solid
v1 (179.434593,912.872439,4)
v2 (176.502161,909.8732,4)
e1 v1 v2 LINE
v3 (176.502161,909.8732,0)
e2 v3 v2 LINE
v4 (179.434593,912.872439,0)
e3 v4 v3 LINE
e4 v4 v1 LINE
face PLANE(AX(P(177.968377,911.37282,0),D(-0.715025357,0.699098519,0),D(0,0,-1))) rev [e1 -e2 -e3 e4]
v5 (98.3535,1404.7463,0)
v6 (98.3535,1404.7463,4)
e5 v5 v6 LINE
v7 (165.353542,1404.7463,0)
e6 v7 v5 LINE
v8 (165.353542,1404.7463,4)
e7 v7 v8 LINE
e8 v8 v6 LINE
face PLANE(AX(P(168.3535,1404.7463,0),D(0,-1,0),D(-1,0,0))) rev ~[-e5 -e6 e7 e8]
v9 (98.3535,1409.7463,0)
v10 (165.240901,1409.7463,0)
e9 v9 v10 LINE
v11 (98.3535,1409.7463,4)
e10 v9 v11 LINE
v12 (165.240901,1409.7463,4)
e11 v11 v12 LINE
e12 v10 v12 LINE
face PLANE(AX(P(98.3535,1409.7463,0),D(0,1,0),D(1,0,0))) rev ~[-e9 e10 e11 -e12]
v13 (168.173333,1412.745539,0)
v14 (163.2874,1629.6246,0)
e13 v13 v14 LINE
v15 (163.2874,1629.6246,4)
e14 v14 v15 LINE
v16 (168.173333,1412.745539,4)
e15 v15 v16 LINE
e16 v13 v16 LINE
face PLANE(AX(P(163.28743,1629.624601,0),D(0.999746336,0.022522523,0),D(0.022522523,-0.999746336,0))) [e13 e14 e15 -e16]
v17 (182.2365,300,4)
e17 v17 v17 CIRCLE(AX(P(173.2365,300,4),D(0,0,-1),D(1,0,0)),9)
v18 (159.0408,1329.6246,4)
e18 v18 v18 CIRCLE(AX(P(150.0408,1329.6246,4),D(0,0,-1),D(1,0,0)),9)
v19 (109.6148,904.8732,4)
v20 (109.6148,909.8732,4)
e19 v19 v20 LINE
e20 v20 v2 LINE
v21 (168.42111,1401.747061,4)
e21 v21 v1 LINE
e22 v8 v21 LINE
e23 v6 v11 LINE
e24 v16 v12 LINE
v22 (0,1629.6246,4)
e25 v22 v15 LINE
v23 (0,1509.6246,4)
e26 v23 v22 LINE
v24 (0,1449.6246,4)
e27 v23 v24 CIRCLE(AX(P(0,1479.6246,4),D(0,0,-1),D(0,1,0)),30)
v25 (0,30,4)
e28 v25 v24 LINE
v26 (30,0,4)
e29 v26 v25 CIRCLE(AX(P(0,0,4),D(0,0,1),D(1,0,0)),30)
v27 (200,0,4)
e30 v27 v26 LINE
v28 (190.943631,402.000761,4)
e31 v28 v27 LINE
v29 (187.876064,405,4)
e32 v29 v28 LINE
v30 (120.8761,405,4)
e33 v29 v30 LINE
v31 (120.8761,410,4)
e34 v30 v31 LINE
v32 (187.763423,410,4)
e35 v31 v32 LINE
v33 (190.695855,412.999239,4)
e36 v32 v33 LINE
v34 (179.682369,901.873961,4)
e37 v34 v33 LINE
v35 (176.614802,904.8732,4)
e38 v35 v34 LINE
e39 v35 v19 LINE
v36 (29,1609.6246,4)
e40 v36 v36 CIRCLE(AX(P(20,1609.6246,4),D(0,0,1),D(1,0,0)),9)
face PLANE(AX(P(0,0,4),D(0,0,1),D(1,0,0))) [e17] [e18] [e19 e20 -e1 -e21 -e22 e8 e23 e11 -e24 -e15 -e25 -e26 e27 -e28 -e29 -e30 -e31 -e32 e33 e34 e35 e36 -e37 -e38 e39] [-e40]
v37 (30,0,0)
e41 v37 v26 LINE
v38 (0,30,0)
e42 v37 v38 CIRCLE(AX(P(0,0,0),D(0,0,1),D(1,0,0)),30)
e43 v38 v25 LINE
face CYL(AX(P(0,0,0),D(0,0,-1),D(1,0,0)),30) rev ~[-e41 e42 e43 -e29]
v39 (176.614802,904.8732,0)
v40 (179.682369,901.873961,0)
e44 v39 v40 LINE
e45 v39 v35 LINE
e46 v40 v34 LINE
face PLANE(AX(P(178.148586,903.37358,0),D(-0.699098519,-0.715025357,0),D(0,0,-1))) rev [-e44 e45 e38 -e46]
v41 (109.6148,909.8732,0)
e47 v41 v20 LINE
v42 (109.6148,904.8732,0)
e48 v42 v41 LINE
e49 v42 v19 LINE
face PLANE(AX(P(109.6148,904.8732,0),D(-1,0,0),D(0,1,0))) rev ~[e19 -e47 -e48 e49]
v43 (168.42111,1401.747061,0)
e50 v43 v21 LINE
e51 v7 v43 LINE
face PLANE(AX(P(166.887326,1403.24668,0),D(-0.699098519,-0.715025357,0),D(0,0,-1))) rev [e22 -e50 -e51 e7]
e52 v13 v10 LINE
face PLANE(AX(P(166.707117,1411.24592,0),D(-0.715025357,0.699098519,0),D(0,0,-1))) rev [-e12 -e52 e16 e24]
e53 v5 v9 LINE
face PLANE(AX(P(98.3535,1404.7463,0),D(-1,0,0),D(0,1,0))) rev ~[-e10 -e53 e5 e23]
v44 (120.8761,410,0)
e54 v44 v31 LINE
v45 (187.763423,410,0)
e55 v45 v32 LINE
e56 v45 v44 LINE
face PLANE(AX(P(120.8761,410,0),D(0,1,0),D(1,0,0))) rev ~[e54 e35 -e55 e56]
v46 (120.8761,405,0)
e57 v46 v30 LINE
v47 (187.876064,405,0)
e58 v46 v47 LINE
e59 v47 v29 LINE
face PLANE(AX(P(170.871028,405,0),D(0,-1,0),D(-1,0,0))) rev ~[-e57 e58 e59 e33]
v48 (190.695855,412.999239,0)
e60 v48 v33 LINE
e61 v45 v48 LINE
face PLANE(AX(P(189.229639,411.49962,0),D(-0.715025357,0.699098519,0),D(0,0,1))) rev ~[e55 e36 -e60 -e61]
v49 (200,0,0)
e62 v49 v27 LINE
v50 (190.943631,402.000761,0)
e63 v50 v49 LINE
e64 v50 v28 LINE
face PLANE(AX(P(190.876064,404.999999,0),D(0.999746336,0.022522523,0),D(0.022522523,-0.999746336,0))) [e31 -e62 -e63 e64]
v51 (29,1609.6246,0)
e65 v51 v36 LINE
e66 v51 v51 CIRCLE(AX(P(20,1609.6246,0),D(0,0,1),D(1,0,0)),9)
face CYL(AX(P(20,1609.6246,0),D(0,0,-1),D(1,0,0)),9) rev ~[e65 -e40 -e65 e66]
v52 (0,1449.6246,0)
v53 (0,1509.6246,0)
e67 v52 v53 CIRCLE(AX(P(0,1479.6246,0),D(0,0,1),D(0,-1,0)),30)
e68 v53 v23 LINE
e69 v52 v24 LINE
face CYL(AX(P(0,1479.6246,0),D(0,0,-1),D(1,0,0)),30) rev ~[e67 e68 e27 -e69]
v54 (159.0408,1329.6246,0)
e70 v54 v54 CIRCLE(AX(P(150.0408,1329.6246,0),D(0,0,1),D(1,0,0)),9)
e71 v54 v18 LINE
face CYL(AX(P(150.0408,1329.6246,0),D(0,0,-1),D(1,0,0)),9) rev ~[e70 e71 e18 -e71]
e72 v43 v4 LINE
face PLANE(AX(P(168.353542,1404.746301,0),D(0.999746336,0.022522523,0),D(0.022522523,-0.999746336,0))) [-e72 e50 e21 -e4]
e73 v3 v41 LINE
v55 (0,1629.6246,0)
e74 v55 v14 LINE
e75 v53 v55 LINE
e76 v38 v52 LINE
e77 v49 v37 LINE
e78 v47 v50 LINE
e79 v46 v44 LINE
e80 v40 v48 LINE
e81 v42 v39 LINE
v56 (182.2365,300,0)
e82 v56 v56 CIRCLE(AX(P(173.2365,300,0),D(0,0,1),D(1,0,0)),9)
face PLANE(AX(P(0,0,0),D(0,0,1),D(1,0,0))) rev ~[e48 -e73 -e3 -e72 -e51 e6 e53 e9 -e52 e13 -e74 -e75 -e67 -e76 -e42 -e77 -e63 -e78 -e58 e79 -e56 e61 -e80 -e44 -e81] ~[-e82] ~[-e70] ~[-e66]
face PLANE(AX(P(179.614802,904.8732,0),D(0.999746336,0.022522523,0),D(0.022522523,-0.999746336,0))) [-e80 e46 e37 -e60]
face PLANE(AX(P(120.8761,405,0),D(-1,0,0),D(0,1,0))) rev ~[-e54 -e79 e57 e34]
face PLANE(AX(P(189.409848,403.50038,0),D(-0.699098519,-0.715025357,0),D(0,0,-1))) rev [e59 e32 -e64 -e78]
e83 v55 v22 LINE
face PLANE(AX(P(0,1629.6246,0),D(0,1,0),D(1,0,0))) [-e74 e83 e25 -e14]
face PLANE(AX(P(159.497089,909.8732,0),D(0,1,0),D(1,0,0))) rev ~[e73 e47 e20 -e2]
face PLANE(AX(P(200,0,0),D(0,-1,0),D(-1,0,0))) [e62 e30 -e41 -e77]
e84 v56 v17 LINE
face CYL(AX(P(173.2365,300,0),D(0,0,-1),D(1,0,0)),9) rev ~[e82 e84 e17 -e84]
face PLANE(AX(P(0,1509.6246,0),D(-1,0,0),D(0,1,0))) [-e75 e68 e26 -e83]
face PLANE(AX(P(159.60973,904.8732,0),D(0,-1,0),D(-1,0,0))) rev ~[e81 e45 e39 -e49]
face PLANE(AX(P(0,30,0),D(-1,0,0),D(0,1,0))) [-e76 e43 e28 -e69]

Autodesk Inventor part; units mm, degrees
ref_plane "YZ Plane" through (0, 0, 0) normal (1, 0, 0) x (0, 1, 0)
ref_plane "XZ Plane" through (0, 0, 0) normal (0, 1, 0) x (-1, 0, 0)
ref_plane "XY Plane" through (0, 0, 0) normal (0, 0, 1) x (1, 0, 0)
sketch "Sketch1" plane through (0, 0, 0) normal (0, 0, 1) x (1, 0, 0)
  line L0 (0, 0) -> (0, 4438.8737)
  line L1 (0, 4438.8737) -> (100, 4438.8737)
  line L2 (100, 4438.8737) -> (200, 0)
  line L3 (200, 0) -> (0, 0)
  circle A0 centre (0, 0) radius 30
  line L4 (0, 1479.6246) -> (166.6667, 1479.6246)
  line L5 (0, 2959.2492) -> (133.3333, 2959.2492)
  circle A1 centre (0, 1479.6246) radius 30
  circle A2 centre (0, 2959.2492) radius 30
  line L6 (190.8761, 405) -> (120.8761, 405)
  line L7 (120.8761, 405) -> (120.8761, 410)
  line L8 (120.8761, 410) -> (190.8761, 410)
  line L9 (190.8761, 410) -> (190.8761, 405)
  line L10 (109.6148, 909.8732) -> (179.6148, 909.8732)
  line L11 (179.6148, 904.8732) -> (109.6148, 904.8732)
  line L12 (109.6148, 904.8732) -> (109.6148, 909.8732)
  line L13 (179.6148, 909.8732) -> (179.6148, 904.8732)
  line L14 (98.3535, 1409.7463) -> (168.3535, 1409.7463)
  line L15 (168.3535, 1404.7463) -> (98.3535, 1404.7463)
  line L16 (98.3535, 1404.7463) -> (98.3535, 1409.7463)
  line L17 (168.3535, 1409.7463) -> (168.3535, 1404.7463)
  line L18 (87.0923, 1909.6195) -> (157.0923, 1909.6195)
  line L19 (157.0923, 1904.6195) -> (87.0923, 1904.6195)
  line L20 (87.0923, 1904.6195) -> (87.0923, 1909.6195)
  line L21 (157.0923, 1909.6195) -> (157.0923, 1904.6195)
  line L22 (75.831, 2409.4927) -> (145.831, 2409.4927)
  line L23 (145.831, 2404.4927) -> (75.831, 2404.4927)
  line L24 (75.831, 2404.4927) -> (75.831, 2409.4927)
  line L25 (145.831, 2409.4927) -> (145.831, 2404.4927)
  line L26 (64.5698, 2909.3658) -> (134.5698, 2909.3658)
  line L27 (134.5698, 2904.3658) -> (64.5698, 2904.3658)
  line L28 (64.5698, 2904.3658) -> (64.5698, 2909.3658)
  line L29 (134.5698, 2909.3658) -> (134.5698, 2904.3658)
  line L30 (53.3085, 3409.239) -> (123.3085, 3409.239)
  line L31 (123.3085, 3404.239) -> (53.3085, 3404.239)
  line L32 (53.3085, 3404.239) -> (53.3085, 3409.239)
  line L33 (123.3085, 3409.239) -> (123.3085, 3404.239)
  line L34 (42.0472, 3909.1122) -> (112.0472, 3909.1122)
  line L35 (112.0472, 3904.1122) -> (42.0472, 3904.1122)
  line L36 (42.0472, 3904.1122) -> (42.0472, 3909.1122)
  line L37 (112.0472, 3909.1122) -> (112.0472, 3904.1122)
  line L38 (0, 1629.6246) -> (163.2874, 1629.6246)
  line L39 (0, 3079.2492) -> (130.6299, 3079.2492)
  circle A3 centre (20, 1609.6246) radius 9
  circle A4 centre (150.0408, 1329.6246) radius 9
  circle A5 centre (173.2365, 300) radius 9
  line L40 (173.2365, 300) -> (150.0408, 1329.6246)
  point P0 (30, 2959.2492)
  point P1 (0, 2929.2492)
  point P2 (0, 1509.6246)
  point P3 (0, 1449.6246)
  point P4 (0, 30)
  point P5 (30, 0)
  point P6 (190.7634, 410)
  point P7 (179.5022, 909.8732)
  point P8 (168.3535, 1404.7463)
  point P9 (168.2409, 1409.7463)
  point P10 (30, 1479.6246)
  dimension "d65" = 100
  dimension "d67" = 200
  dimension "d68" = 60
  dimension "d69" = 1480
  dimension "d70" = 1480
  dimension "d71" = 1480
  dimension "d72" = 5
  dimension "d73" = 70
  dimension "d74" = 410
  dimension "d77" = 500
  dimension "d82" = 120
  dimension "d83" = 150
  dimension "d88" = 20
  dimension "d89" = 20
  dimension "d90" = 18
  dimension "d91" = 20
  dimension "d92" = 300
  dimension "d93" = 300
extrude "Plate3" add sketch "Sketch1" along normal blind 4 contours L38 L2 L4 A1 L0 | L4 L2 L14 L16 L15 L10 L12 L11 L40 L8 L7 L6 L3 A0 L0 A1 | L2 L8 L40 L11
chamfer "Corner Chamfer2" distance 3 angle 45 6 edges at (190.7634, 410, 2) (190.8761, 405, 2) (179.6148, 904.8732, 2) (179.5022, 909.8732, 2) (168.3535, 1404.7463, 2) (168.2409, 1409.7463, 2)
equation "\"BendRadius\" = Thickness"
equation "\"BendReliefWidth\" = Thickness"
equation "\"BendReliefDepth\" = 0.5 * Thickness"
equation "\"CornerReliefSize\" = 4 * Thickness"
equation "\"MinimumRemnant\" = 2 * Thickness"
equation "\"TransitionRadius\" = BendRadius"
equation "\"JacobiRadiusSize\" = BendRadius"
equation "\"GapSize\" = Thickness"
equation "\"Thickness\" = 4"
properties part number "GBK 3112 central main rib" material "Steel"
